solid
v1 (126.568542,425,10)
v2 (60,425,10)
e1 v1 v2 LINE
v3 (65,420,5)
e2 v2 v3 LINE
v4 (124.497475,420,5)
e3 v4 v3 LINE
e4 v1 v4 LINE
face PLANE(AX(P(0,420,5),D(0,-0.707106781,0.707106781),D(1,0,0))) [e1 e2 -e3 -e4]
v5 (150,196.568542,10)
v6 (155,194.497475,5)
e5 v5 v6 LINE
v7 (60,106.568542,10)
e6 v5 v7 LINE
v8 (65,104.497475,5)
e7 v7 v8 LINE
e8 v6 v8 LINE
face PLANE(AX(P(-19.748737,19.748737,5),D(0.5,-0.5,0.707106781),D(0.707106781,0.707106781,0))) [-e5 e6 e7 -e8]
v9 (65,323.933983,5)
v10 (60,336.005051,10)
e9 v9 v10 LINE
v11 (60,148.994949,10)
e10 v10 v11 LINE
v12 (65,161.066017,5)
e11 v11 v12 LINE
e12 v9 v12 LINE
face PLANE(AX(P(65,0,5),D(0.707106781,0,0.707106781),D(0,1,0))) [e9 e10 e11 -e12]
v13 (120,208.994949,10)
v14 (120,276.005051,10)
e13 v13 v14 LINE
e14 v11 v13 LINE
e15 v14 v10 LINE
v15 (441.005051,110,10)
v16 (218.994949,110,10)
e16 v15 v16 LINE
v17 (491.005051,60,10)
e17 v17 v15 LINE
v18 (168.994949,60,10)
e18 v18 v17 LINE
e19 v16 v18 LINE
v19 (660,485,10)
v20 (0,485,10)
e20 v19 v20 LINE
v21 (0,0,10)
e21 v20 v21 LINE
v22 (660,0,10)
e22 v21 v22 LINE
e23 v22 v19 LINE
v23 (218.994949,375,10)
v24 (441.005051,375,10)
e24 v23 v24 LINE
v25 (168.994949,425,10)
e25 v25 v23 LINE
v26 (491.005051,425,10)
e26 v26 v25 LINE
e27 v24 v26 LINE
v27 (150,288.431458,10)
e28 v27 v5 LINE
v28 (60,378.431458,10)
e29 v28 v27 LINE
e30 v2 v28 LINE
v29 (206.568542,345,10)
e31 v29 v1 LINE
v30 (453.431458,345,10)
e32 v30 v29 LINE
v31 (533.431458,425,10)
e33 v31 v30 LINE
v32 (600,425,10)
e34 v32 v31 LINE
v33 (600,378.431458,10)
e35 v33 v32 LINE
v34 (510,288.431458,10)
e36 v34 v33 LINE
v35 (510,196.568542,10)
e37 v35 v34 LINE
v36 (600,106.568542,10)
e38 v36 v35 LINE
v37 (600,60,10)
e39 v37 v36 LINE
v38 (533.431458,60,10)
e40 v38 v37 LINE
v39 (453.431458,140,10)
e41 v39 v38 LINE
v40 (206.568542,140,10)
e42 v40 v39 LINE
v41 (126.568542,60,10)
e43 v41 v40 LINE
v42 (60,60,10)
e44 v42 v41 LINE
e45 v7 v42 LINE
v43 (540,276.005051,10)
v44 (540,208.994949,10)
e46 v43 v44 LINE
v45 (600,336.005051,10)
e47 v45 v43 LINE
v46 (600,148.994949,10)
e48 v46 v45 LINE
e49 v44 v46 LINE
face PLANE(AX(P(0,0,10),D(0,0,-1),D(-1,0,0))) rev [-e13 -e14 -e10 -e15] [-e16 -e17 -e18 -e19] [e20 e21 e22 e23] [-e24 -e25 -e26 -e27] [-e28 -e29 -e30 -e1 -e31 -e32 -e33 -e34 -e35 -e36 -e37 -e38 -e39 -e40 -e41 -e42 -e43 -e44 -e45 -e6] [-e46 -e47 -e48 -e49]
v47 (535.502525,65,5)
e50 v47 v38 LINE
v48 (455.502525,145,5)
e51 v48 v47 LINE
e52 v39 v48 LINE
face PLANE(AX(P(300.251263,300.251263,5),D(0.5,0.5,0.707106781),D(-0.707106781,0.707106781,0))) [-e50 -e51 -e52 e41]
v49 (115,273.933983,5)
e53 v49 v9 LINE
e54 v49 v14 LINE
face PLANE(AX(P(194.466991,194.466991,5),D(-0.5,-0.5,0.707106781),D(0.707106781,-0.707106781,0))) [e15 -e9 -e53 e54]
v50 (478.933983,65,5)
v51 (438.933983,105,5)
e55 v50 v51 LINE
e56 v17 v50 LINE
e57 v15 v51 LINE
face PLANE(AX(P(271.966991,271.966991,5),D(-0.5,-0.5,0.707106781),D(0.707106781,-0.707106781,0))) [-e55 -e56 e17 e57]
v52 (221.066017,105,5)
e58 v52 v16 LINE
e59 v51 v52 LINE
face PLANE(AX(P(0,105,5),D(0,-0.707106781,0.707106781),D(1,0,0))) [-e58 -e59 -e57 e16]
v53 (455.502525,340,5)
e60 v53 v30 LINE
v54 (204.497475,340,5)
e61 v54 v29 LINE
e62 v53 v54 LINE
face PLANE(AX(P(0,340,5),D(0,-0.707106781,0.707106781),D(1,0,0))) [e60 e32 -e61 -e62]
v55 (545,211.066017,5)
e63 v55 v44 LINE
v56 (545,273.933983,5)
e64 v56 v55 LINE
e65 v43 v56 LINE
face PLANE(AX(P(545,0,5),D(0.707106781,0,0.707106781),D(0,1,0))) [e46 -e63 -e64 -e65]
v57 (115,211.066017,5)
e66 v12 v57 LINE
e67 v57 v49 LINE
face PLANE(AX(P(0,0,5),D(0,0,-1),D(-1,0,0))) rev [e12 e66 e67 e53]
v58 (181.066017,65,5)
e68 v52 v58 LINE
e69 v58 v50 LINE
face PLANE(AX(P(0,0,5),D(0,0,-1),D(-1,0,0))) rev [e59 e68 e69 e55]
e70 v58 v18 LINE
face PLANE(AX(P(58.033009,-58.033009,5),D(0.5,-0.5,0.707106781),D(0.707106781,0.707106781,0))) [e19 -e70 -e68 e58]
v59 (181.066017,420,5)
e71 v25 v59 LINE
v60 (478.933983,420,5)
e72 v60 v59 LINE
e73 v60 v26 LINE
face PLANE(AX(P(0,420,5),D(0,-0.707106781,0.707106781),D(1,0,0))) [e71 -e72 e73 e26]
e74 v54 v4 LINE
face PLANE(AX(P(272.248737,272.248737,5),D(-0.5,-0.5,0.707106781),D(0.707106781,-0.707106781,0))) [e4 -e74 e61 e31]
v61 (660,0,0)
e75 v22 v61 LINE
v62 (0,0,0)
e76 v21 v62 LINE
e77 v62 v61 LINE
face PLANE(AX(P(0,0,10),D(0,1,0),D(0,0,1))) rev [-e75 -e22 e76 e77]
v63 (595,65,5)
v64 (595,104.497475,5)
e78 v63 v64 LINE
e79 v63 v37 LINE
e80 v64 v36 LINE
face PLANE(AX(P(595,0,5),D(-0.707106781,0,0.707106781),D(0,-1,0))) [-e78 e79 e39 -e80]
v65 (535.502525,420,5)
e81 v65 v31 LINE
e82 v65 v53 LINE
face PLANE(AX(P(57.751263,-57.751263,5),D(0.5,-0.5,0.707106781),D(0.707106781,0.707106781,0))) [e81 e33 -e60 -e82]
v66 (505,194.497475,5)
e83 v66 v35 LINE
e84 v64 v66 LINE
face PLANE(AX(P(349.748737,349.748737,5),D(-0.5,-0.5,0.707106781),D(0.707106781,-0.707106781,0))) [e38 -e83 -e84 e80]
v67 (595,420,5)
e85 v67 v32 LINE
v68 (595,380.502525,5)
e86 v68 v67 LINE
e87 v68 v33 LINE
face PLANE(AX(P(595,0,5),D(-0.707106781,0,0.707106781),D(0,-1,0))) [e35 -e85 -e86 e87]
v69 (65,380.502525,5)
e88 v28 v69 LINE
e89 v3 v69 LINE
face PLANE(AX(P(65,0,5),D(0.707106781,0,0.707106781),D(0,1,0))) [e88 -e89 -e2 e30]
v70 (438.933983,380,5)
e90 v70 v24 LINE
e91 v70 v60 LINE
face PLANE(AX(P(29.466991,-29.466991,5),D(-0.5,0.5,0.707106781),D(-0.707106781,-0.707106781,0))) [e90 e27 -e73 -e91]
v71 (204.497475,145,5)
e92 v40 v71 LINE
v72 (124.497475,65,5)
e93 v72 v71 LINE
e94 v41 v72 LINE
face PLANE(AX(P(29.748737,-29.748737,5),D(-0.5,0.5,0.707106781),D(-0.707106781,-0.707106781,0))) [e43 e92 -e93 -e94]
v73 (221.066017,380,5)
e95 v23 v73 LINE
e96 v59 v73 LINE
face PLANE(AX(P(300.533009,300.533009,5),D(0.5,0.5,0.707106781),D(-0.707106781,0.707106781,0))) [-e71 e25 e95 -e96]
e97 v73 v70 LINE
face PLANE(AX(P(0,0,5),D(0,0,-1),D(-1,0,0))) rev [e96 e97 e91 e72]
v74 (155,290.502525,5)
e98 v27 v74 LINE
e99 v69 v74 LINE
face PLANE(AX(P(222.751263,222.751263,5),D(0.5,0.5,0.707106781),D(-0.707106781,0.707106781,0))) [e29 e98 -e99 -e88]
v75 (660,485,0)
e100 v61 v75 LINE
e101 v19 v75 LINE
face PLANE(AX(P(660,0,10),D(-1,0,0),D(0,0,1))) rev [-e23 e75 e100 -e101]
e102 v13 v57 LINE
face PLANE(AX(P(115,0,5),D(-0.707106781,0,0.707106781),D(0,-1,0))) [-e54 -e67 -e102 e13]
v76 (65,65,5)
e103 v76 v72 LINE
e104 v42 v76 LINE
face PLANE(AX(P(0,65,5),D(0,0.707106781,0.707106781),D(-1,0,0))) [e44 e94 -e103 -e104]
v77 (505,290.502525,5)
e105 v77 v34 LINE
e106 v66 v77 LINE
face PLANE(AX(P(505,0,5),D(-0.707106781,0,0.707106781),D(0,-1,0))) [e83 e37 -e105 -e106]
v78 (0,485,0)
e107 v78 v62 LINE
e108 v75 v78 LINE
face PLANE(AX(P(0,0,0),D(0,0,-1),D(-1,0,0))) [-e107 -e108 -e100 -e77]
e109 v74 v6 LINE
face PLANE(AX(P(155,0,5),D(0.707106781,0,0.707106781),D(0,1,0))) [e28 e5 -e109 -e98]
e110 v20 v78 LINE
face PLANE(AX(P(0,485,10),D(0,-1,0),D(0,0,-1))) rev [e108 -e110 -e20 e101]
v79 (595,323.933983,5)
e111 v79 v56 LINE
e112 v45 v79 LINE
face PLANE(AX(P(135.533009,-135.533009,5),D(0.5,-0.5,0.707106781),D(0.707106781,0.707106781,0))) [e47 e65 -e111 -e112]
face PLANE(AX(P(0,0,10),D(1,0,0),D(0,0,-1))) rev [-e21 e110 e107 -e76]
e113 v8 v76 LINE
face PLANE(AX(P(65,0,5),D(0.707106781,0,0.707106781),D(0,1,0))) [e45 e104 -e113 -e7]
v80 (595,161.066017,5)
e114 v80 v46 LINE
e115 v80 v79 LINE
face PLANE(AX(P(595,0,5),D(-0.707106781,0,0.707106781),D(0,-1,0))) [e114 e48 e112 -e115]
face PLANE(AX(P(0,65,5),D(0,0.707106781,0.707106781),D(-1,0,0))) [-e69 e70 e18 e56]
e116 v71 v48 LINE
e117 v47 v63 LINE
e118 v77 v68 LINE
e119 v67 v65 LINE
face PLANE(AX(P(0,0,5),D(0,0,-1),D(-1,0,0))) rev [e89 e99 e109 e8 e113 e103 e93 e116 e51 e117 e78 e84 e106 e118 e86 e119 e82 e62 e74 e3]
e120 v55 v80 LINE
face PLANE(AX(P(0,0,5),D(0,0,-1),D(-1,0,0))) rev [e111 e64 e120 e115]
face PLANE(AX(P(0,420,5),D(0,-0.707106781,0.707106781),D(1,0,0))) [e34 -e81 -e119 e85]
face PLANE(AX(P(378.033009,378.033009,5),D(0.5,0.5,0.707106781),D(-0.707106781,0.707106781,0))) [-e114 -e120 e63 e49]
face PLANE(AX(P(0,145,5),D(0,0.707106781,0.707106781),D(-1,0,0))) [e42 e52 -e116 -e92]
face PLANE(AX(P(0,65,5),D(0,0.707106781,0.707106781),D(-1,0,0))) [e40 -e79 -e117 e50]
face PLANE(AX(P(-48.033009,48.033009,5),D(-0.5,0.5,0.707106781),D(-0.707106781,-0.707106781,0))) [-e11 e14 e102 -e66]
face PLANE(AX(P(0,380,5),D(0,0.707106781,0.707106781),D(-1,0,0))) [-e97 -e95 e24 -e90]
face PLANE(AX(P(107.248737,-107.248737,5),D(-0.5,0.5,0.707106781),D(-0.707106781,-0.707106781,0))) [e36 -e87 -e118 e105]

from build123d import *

# Parameters (mm, degrees)
ESQUISSE1_W             = 660
ESQUISSE1_H             = 485
BOSS_EXTRU_1_DEPTH      = 10
ENL_V_MAT_EXTRU_1_DEPTH = 5
CHANFREIN1_SIZE         = 5


with BuildPart() as part:
    # Esquisse1 → Boss.-Extru.1 (new body)
    with BuildSketch(Plane.XY):
        with Locations((330, 242.5)):
            Rectangle(ESQUISSE1_W, ESQUISSE1_H)
    extrude(amount=BOSS_EXTRU_1_DEPTH)

    # Esquisse2 → Enlèv. mat.-Extru.1 (cut)
    with BuildSketch(Plane.XY.offset(10)):
        Polygon((120, 208.994949366), (120, 276.005050634), (60, 336.005050634), (60, 148.994949366), align=None)
        Polygon((218.994949366, 375), (441.005050634, 375), (491.005050634, 425), (168.994949366, 425), align=None)
        Polygon((60, 425), (60, 378.431457505), (150, 288.431457505), (150, 196.568542495), (60, 106.568542495), (60, 60), (126.568542495, 60), (206.568542495, 140), (453.431457505, 140), (533.431457505, 60), (600, 60), (600, 106.568542495), (510, 196.568542495), (510, 288.431457505), (600, 378.431457505), (600, 425), (533.431457505, 425), (453.431457505, 345), (206.568542495, 345), (126.568542495, 425), align=None)
        Polygon((540, 208.994949366), (540, 276.005050634), (600, 336.005050634), (600, 148.994949366), align=None)
        Polygon((491.005050634, 60), (168.994949366, 60), (218.994949366, 110), (441.005050634, 110), align=None)
    extrude(amount=-ENL_V_MAT_EXTRU_1_DEPTH, mode=Mode.SUBTRACT)

    # Chanfrein1
    chanfrein1_edges = [part.edges().sort_by_distance(p)[0] for p in [
        (330, 60, 5),
        (193.994949366, 85, 5),
        (330, 110, 5),
        (466.005050634, 85, 5),
        (60, 242.5, 5),
        (90, 306.005050634, 5),
        (120, 242.5, 5),
        (90, 178.994949366, 5),
        (600, 242.5, 5),
        (570, 178.994949366, 5),
        (540, 242.5, 5),
        (570, 306.005050634, 5),
        (166.568542495, 385, 5),
        (330, 345, 5),
        (493.431457505, 385, 5),
        (566.715728753, 425, 5),
        (600, 401.715728753, 5),
        (555, 333.431457505, 5),
        (510, 242.5, 5),
        (555, 151.568542495, 5),
        (600, 83.284271247, 5),
        (566.715728753, 60, 5),
        (493.431457505, 100, 5),
        (330, 140, 5),
        (166.568542495, 100, 5),
        (93.284271247, 60, 5),
        (60, 83.284271247, 5),
        (105, 151.568542495, 5),
        (150, 242.5, 5),
        (105, 333.431457505, 5),
        (60, 401.715728753, 5),
        (93.284271247, 425, 5),
        (330, 425, 5),
        (466.005050634, 400, 5),
        (330, 375, 5),
        (193.994949366, 400, 5),
    ]]
    chamfer(chanfrein1_edges, length=CHANFREIN1_SIZE - 0.0001)  # a hair under: the kernel refuses the full size


solid = part.part
